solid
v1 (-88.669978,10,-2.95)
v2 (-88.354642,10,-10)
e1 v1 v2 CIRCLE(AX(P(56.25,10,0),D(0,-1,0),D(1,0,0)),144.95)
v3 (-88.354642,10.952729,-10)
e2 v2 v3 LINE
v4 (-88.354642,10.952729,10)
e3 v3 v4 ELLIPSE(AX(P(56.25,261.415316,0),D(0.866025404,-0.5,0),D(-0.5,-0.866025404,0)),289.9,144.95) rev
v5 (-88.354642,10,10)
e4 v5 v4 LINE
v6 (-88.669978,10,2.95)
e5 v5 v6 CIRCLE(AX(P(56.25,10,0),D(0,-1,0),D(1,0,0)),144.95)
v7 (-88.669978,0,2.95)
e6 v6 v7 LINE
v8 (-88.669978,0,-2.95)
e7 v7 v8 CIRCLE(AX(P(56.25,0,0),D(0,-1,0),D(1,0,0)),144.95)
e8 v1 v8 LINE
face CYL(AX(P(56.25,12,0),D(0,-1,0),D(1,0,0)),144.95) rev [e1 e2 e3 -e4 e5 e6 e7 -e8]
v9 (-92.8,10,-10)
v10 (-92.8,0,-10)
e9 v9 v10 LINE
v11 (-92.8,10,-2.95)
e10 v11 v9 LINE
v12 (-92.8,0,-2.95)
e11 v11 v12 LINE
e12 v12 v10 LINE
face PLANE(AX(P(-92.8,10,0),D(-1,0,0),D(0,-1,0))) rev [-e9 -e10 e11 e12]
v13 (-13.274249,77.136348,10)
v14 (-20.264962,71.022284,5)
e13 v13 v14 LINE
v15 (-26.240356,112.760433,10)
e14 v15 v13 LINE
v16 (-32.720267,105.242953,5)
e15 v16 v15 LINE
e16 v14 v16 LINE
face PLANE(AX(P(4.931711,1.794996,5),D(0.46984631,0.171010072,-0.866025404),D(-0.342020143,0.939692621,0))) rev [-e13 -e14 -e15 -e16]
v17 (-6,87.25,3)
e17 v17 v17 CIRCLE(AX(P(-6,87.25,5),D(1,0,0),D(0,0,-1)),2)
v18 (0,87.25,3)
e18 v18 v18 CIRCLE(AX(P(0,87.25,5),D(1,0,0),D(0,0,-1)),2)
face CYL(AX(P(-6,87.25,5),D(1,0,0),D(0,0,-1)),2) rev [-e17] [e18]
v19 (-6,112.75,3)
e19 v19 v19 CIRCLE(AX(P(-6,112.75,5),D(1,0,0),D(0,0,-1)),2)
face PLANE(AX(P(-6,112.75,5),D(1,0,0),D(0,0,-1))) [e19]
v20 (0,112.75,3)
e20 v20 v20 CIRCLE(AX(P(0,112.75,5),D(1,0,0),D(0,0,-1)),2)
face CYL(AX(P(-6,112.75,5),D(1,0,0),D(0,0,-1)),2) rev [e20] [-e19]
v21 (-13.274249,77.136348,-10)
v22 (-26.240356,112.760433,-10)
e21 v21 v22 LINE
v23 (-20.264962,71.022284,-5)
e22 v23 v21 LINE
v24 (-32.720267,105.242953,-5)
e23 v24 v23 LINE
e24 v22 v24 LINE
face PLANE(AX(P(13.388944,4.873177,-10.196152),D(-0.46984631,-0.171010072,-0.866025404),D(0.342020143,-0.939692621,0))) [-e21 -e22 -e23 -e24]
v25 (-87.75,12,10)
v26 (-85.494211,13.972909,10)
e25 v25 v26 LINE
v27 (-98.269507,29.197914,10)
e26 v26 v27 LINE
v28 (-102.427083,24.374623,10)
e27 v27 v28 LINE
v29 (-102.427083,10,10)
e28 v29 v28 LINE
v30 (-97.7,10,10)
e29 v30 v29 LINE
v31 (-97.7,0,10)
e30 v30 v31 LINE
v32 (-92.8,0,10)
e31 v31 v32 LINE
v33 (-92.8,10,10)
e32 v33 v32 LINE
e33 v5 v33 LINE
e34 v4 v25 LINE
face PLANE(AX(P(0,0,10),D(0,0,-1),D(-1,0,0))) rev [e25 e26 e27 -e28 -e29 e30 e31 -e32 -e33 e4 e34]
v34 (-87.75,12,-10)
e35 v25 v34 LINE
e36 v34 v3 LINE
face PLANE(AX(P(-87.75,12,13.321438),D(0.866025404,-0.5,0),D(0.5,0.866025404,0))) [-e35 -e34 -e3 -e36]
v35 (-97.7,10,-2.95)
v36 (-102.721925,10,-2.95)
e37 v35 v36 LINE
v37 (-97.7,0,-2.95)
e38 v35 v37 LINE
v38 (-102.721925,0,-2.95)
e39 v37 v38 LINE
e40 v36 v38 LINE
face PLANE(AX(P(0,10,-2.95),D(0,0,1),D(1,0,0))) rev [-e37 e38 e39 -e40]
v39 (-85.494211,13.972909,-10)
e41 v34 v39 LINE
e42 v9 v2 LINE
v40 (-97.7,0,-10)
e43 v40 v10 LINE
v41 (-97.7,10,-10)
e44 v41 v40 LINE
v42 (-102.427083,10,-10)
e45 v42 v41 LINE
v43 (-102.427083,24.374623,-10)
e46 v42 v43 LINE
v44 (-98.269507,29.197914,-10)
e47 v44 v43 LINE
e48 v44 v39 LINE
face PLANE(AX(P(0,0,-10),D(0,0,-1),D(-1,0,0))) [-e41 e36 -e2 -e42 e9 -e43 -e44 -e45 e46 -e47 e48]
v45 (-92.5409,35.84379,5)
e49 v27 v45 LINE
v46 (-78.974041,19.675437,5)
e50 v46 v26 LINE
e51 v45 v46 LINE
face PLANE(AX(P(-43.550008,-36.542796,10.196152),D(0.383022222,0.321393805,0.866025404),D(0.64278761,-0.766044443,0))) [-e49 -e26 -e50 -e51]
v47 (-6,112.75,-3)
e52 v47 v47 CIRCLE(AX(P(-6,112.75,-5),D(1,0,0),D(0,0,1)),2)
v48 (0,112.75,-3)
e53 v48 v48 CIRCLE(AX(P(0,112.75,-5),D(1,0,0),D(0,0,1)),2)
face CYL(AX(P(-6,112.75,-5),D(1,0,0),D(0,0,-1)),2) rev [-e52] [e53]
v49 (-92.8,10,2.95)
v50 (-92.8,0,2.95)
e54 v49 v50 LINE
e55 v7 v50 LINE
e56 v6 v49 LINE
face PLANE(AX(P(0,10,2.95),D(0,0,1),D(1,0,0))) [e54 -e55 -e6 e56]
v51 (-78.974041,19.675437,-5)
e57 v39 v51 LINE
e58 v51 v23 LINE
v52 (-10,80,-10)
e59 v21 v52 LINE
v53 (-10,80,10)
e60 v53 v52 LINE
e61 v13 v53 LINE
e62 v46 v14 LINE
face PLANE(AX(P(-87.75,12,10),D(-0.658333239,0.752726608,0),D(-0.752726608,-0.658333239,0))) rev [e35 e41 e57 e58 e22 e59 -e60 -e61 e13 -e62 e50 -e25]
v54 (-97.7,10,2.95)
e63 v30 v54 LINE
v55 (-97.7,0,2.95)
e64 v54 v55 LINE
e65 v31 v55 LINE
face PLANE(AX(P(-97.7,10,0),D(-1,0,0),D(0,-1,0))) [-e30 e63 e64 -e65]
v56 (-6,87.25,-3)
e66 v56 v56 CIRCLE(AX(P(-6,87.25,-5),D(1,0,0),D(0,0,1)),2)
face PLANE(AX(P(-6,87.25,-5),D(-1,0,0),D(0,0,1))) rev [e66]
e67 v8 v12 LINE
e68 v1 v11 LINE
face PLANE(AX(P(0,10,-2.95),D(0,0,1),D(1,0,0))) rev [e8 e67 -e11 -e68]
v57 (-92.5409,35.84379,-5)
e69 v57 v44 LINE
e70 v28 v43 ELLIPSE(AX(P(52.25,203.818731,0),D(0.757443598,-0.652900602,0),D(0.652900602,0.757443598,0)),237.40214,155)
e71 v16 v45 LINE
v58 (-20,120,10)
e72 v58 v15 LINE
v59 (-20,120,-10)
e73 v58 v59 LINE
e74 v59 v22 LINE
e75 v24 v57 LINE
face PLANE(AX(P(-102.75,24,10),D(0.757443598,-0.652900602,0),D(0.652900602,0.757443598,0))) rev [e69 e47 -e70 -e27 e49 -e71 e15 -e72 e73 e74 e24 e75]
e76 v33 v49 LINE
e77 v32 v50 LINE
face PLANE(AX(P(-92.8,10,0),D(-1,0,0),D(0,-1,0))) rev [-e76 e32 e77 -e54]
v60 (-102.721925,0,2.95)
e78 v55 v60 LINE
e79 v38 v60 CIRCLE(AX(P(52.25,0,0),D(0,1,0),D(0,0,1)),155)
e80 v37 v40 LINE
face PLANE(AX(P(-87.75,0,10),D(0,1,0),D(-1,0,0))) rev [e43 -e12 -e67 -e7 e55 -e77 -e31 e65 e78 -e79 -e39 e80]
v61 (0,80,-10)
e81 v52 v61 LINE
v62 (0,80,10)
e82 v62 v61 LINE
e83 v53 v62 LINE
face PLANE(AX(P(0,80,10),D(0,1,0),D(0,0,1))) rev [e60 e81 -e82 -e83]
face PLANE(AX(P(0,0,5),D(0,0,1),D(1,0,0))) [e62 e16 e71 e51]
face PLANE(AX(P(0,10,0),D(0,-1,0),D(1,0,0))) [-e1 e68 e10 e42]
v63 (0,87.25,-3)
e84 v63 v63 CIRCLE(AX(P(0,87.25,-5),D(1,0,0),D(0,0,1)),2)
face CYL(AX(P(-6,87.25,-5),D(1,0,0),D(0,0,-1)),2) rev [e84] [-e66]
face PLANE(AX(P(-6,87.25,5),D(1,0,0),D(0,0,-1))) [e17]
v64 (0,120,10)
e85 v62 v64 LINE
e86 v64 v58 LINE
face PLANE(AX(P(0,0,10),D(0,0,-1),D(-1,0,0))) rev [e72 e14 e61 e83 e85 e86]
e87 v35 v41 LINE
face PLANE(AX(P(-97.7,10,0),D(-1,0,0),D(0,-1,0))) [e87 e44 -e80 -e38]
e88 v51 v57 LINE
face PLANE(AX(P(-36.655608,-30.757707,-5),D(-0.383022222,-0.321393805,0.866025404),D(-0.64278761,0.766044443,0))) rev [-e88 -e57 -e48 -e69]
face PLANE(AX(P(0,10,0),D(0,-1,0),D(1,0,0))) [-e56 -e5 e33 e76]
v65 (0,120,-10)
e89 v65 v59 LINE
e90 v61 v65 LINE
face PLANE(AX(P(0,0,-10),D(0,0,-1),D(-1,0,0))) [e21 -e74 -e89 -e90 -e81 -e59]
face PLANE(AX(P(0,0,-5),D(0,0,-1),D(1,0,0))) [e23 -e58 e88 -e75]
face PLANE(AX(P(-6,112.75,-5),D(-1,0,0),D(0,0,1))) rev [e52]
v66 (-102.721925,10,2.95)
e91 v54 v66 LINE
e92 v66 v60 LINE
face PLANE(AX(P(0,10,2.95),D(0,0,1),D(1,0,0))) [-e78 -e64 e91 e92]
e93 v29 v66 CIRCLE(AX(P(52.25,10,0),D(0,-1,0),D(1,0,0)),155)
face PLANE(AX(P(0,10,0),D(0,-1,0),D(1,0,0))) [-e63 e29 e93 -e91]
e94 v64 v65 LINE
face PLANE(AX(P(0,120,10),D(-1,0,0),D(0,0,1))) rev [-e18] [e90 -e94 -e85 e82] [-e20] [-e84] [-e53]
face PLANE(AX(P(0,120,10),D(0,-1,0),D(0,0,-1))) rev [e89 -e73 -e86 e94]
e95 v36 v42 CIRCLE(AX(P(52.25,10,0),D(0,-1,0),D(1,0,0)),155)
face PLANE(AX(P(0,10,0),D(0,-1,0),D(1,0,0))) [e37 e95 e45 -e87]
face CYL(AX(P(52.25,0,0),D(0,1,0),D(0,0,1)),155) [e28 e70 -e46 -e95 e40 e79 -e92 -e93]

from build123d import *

# Parameters (mm, degrees)
BOSS_EXTRUDE1_DEPTH        = 10
SKETCH2_W                  = 5.05
SKETCH2_H                  = 7.05
CUT_EXTRUDE6_DEPTH         = 10
CUT_EXTRUDE7_DEPTH         = 5
CHAMFER2_SIZE              = 5.196152423
CHAMFER2_SIZE_2            = 9
CHAMFER2_OF_MIRROR4_SIZE   = 5.196152423
CHAMFER2_OF_MIRROR4_SIZE_2 = 9
SKETCH5_R                  = 2
CUT_EXTRUDE5_DEPTH         = 6
CUT_EXTRUDE8_START         = -120
CUT_EXTRUDE8_DEPTH         = 24.374622763
SKETCH8_R                  = 144.95
CUT_EXTRUDE9_DEPTH         = 12
BOSS_EXTRUDE2_DEPTH        = 20


# Read off the part's stored shape, not the designer's step: Cut-Extrude8
with BuildPart() as part:
    # Sketch1 → Boss-Extrude1 (new, symmetric)
    with BuildSketch(Plane.XY):
        Polygon((0, 120), (0, 80), (-10, 80), (-87.75, 12), (-87.75, 0), (-102.75, 0), (-102.75, 24), (-20, 120), align=None)
    extrude(amount=BOSS_EXTRUDE1_DEPTH, both=True)

    # Sketch2 → Cut-Extrude6 (cut)
    with BuildSketch(Plane.XZ):
        with Locations((-100.225, 6.475)):
            Rectangle(SKETCH2_W, SKETCH2_H)
        with Locations((-90.275, 6.475)):
            Rectangle(SKETCH2_W, SKETCH2_H)
        with Locations((-90.275, -6.475)):
            Rectangle(SKETCH2_W, SKETCH2_H)
        with Locations((-100.225, -6.475)):
            Rectangle(SKETCH2_W, SKETCH2_H)
    extrude(amount=-CUT_EXTRUDE6_DEPTH, mode=Mode.SUBTRACT)

    # Sketch6 → Cut-Extrude7 (cut)
    with BuildSketch(Plane.XY.offset(10)):
        Polygon((-98.494242528, 28.937192959), (-85.75, 13.749196141), (-13, 77.376205788), (-25.986145629, 113.055347669), align=None)
    cut_extrude7 = extrude(amount=-CUT_EXTRUDE7_DEPTH, mode=Mode.SUBTRACT)

    # Chamfer2
    # the kernel refuses this chamfer: 9, 5.196152423 mm, written as the material it adds along each edge
    with BuildSketch(Plane(origin=(-5.036481035, 55.496617251, 5), x_dir=(0.05440243528858507, 0.019800867116638043, 0.9983227437537925), z_dir=(-0.342020143325666, 0.9396926207859094, 0))) as chamfer2_piece_1_section:
        Polygon((CHAMFER2_SIZE * 0.998322743697, -CHAMFER2_SIZE * 0.0578938623994), (-CHAMFER2_SIZE_2 * 0.0578938624027, -CHAMFER2_SIZE_2 * 0.998322743754), (0, 0), align=None)
    chamfer2_piece_1 = extrude(amount=84.536493315, mode=Mode.PRIVATE)
    chamfer2_piece_1 = split(chamfer2_piece_1, bisect_by=Plane(origin=(-21.83844233, 92.842389445, 10), z_dir=(0, 0, -1)), keep=Keep.TOP, mode=Mode.PRIVATE)
    chamfer2_piece_1 = split(chamfer2_piece_1, bisect_by=Plane(origin=(-34.214088998, 103.509939047, 6.650101228), z_dir=(0.7574435982041207, -0.6529006015769894, 0)), keep=Keep.TOP, mode=Mode.PRIVATE)
    chamfer2_piece_1 = split(chamfer2_piece_1, bisect_by=Plane(origin=(-10.343648825, 79.699445401, 6.650101228), z_dir=(-0.6583332390976693, 0.7527266079388791, 0)), keep=Keep.TOP, mode=Mode.PRIVATE)
    add(chamfer2_piece_1)
    with BuildSketch(Plane(origin=(-113.460762542, 46.773596955, 5), x_dir=(-0.04434927158426045, -0.03721345742933334, 0.9983227437537927), z_dir=(0.642787609686533, -0.7660444431189835, 0))) as chamfer2_piece_2_section:
        Polygon((CHAMFER2_SIZE * 0.998322743697, -CHAMFER2_SIZE * 0.0578938623994), (-CHAMFER2_SIZE_2 * 0.0578938624027, -CHAMFER2_SIZE_2 * 0.998322743754), (0, 0), align=None)
    chamfer2_piece_2 = extrude(amount=66.394065339, mode=Mode.PRIVATE)
    chamfer2_piece_2 = split(chamfer2_piece_2, bisect_by=Plane(origin=(-97.520772346, 30.066536009, 6.631431033), z_dir=(0.7574435982041207, -0.6529006015769894, 0)), keep=Keep.TOP, mode=Mode.PRIVATE)
    chamfer2_piece_2 = split(chamfer2_piece_2, bisect_by=Plane(origin=(-83.277010041, 15.912068389, 6.631431033), z_dir=(-0.6583332390976693, 0.7527266079388791, 0)), keep=Keep.TOP, mode=Mode.PRIVATE)
    chamfer2_piece_2 = split(chamfer2_piece_2, bisect_by=Plane(origin=(-89.945880011, 23.537136627, 10), z_dir=(0, 0, -1)), keep=Keep.TOP, mode=Mode.PRIVATE)
    add(chamfer2_piece_2)

    # Mirror4: Cut-Extrude7 across plane
    add(cut_extrude7.mirror(Plane.XY), mode=Mode.SUBTRACT)

    # Chamfer2 of Mirror4
    # the kernel refuses this chamfer: 9, 5.196152423 mm, written as the material it adds along each edge
    with BuildSketch(Plane(origin=(-5.036481035, 55.496617251, -5), x_dir=(0.05440243528858507, 0.019800867116638043, -0.9983227437537925), z_dir=(-0.342020143325666, 0.9396926207859094, 0))) as chamfer2_of_mirror4_piece_1_section:
        Polygon((CHAMFER2_OF_MIRROR4_SIZE * 0.998322743697, CHAMFER2_OF_MIRROR4_SIZE * 0.0578938623994), (-CHAMFER2_OF_MIRROR4_SIZE_2 * 0.0578938624027, CHAMFER2_OF_MIRROR4_SIZE_2 * 0.998322743754), (0, 0), align=None)
    chamfer2_of_mirror4_piece_1 = extrude(amount=84.536493315, mode=Mode.PRIVATE)
    chamfer2_of_mirror4_piece_1 = split(chamfer2_of_mirror4_piece_1, bisect_by=Plane(origin=(-34.214088998, 103.509939047, -6.650101228), z_dir=(0.7574435982040639, -0.6529006015770552, 0)), keep=Keep.TOP, mode=Mode.PRIVATE)
    chamfer2_of_mirror4_piece_1 = split(chamfer2_of_mirror4_piece_1, bisect_by=Plane(origin=(-10.343648825, 79.699445401, -6.650101228), z_dir=(-0.6583332390977968, 0.7527266079387677, 0)), keep=Keep.TOP, mode=Mode.PRIVATE)
    chamfer2_of_mirror4_piece_1 = split(chamfer2_of_mirror4_piece_1, bisect_by=Plane(origin=(-21.83844233, 92.842389445, -10), z_dir=(0, 0, 1)), keep=Keep.TOP, mode=Mode.PRIVATE)
    add(chamfer2_of_mirror4_piece_1)
    with BuildSketch(Plane(origin=(-113.460762542, 46.773596955, -5), x_dir=(0.7659013618145366, 0.6426675502167433, 0.019326765612700778), z_dir=(0.642787609686533, -0.7660444431189835, 0))) as chamfer2_of_mirror4_piece_2_section:
        Polygon((CHAMFER2_OF_MIRROR4_SIZE_2 * 0.999813220622, -CHAMFER2_OF_MIRROR4_SIZE_2 * 0.0193267656127), (-CHAMFER2_OF_MIRROR4_SIZE * 0.0193267656116, -CHAMFER2_OF_MIRROR4_SIZE * 0.999813220566), (0, 0), align=None)
    chamfer2_of_mirror4_piece_2 = extrude(amount=66.394065339, mode=Mode.PRIVATE)
    chamfer2_of_mirror4_piece_2 = split(chamfer2_of_mirror4_piece_2, bisect_by=Plane(origin=(-97.520772346, 30.066536009, -6.631431033), z_dir=(0.7574435982040639, -0.6529006015770552, 0)), keep=Keep.TOP, mode=Mode.PRIVATE)
    chamfer2_of_mirror4_piece_2 = split(chamfer2_of_mirror4_piece_2, bisect_by=Plane(origin=(-83.277010041, 15.912068389, -6.631431033), z_dir=(-0.6583332390977968, 0.7527266079387677, 0)), keep=Keep.TOP, mode=Mode.PRIVATE)
    chamfer2_of_mirror4_piece_2 = split(chamfer2_of_mirror4_piece_2, bisect_by=Plane(origin=(-89.945880011, 23.537136627, -10), z_dir=(0, 0, 1)), keep=Keep.TOP, mode=Mode.PRIVATE)
    add(chamfer2_of_mirror4_piece_2)

    # Sketch5 → Cut-Extrude5 (cut)
    with BuildSketch(Plane(origin=(0, 0, 0), x_dir=(0, 0, -1), z_dir=(1, 0, 0))):
        with Locations((-5, 112.75)):
            Circle(SKETCH5_R)
        with Locations((-5, 87.25)):
            Circle(SKETCH5_R)
        with Locations(Location((5, 87.25, 0), (0, 0, 180))):
            Circle(SKETCH5_R)
        with Locations(Location((5, 112.75, 0), (0, 0, 180))):
            Circle(SKETCH5_R)
    extrude(amount=-CUT_EXTRUDE5_DEPTH, mode=Mode.SUBTRACT)

    # Cut-Extrude8 outline → Cut-Extrude8 (cut)
    with BuildSketch(Plane(origin=(0, 120, 0), x_dir=(1, 0, 0), z_dir=(0, 1, 0)).offset(CUT_EXTRUDE8_START)):
        with BuildLine():
            Line((-102.75, 7.56e-07), (-102.75, -10))
            Line((-102.75, -10), (-102.427082983, -10))
            ThreePointArc((-102.427082983, -10), (-102.669249724, -5.002605828), (-102.75, 7.56e-07))
        make_face()
        with BuildLine():
            Line((-102.427082983, 10), (-102.75, 10))
            Line((-102.75, 10), (-102.75, 7.56e-07))
            ThreePointArc((-102.75, 7.56e-07), (-102.669249699, 5.002606583), (-102.427082983, 10))
        make_face()
    extrude(amount=CUT_EXTRUDE8_DEPTH, mode=Mode.SUBTRACT)

    # Sketch8 → Cut-Extrude9 (cut)
    with BuildSketch(Plane.XZ):
        with Locations((56.25, 0)):
            Circle(SKETCH8_R)
    extrude(amount=-CUT_EXTRUDE9_DEPTH, mode=Mode.SUBTRACT)

    # Sketch10 → Boss-Extrude2 (add)
    with BuildSketch(Plane(origin=(0, 0, -10), x_dir=(-1, 0, 0), z_dir=(0, 0, -1))):
        Polygon((87.75, 12), (88.771540348, 10.230640215), (90.560927794, 10.230640215), (90.560927794, 12), align=None)
    extrude(amount=-BOSS_EXTRUDE2_DEPTH)


solid = part.part
